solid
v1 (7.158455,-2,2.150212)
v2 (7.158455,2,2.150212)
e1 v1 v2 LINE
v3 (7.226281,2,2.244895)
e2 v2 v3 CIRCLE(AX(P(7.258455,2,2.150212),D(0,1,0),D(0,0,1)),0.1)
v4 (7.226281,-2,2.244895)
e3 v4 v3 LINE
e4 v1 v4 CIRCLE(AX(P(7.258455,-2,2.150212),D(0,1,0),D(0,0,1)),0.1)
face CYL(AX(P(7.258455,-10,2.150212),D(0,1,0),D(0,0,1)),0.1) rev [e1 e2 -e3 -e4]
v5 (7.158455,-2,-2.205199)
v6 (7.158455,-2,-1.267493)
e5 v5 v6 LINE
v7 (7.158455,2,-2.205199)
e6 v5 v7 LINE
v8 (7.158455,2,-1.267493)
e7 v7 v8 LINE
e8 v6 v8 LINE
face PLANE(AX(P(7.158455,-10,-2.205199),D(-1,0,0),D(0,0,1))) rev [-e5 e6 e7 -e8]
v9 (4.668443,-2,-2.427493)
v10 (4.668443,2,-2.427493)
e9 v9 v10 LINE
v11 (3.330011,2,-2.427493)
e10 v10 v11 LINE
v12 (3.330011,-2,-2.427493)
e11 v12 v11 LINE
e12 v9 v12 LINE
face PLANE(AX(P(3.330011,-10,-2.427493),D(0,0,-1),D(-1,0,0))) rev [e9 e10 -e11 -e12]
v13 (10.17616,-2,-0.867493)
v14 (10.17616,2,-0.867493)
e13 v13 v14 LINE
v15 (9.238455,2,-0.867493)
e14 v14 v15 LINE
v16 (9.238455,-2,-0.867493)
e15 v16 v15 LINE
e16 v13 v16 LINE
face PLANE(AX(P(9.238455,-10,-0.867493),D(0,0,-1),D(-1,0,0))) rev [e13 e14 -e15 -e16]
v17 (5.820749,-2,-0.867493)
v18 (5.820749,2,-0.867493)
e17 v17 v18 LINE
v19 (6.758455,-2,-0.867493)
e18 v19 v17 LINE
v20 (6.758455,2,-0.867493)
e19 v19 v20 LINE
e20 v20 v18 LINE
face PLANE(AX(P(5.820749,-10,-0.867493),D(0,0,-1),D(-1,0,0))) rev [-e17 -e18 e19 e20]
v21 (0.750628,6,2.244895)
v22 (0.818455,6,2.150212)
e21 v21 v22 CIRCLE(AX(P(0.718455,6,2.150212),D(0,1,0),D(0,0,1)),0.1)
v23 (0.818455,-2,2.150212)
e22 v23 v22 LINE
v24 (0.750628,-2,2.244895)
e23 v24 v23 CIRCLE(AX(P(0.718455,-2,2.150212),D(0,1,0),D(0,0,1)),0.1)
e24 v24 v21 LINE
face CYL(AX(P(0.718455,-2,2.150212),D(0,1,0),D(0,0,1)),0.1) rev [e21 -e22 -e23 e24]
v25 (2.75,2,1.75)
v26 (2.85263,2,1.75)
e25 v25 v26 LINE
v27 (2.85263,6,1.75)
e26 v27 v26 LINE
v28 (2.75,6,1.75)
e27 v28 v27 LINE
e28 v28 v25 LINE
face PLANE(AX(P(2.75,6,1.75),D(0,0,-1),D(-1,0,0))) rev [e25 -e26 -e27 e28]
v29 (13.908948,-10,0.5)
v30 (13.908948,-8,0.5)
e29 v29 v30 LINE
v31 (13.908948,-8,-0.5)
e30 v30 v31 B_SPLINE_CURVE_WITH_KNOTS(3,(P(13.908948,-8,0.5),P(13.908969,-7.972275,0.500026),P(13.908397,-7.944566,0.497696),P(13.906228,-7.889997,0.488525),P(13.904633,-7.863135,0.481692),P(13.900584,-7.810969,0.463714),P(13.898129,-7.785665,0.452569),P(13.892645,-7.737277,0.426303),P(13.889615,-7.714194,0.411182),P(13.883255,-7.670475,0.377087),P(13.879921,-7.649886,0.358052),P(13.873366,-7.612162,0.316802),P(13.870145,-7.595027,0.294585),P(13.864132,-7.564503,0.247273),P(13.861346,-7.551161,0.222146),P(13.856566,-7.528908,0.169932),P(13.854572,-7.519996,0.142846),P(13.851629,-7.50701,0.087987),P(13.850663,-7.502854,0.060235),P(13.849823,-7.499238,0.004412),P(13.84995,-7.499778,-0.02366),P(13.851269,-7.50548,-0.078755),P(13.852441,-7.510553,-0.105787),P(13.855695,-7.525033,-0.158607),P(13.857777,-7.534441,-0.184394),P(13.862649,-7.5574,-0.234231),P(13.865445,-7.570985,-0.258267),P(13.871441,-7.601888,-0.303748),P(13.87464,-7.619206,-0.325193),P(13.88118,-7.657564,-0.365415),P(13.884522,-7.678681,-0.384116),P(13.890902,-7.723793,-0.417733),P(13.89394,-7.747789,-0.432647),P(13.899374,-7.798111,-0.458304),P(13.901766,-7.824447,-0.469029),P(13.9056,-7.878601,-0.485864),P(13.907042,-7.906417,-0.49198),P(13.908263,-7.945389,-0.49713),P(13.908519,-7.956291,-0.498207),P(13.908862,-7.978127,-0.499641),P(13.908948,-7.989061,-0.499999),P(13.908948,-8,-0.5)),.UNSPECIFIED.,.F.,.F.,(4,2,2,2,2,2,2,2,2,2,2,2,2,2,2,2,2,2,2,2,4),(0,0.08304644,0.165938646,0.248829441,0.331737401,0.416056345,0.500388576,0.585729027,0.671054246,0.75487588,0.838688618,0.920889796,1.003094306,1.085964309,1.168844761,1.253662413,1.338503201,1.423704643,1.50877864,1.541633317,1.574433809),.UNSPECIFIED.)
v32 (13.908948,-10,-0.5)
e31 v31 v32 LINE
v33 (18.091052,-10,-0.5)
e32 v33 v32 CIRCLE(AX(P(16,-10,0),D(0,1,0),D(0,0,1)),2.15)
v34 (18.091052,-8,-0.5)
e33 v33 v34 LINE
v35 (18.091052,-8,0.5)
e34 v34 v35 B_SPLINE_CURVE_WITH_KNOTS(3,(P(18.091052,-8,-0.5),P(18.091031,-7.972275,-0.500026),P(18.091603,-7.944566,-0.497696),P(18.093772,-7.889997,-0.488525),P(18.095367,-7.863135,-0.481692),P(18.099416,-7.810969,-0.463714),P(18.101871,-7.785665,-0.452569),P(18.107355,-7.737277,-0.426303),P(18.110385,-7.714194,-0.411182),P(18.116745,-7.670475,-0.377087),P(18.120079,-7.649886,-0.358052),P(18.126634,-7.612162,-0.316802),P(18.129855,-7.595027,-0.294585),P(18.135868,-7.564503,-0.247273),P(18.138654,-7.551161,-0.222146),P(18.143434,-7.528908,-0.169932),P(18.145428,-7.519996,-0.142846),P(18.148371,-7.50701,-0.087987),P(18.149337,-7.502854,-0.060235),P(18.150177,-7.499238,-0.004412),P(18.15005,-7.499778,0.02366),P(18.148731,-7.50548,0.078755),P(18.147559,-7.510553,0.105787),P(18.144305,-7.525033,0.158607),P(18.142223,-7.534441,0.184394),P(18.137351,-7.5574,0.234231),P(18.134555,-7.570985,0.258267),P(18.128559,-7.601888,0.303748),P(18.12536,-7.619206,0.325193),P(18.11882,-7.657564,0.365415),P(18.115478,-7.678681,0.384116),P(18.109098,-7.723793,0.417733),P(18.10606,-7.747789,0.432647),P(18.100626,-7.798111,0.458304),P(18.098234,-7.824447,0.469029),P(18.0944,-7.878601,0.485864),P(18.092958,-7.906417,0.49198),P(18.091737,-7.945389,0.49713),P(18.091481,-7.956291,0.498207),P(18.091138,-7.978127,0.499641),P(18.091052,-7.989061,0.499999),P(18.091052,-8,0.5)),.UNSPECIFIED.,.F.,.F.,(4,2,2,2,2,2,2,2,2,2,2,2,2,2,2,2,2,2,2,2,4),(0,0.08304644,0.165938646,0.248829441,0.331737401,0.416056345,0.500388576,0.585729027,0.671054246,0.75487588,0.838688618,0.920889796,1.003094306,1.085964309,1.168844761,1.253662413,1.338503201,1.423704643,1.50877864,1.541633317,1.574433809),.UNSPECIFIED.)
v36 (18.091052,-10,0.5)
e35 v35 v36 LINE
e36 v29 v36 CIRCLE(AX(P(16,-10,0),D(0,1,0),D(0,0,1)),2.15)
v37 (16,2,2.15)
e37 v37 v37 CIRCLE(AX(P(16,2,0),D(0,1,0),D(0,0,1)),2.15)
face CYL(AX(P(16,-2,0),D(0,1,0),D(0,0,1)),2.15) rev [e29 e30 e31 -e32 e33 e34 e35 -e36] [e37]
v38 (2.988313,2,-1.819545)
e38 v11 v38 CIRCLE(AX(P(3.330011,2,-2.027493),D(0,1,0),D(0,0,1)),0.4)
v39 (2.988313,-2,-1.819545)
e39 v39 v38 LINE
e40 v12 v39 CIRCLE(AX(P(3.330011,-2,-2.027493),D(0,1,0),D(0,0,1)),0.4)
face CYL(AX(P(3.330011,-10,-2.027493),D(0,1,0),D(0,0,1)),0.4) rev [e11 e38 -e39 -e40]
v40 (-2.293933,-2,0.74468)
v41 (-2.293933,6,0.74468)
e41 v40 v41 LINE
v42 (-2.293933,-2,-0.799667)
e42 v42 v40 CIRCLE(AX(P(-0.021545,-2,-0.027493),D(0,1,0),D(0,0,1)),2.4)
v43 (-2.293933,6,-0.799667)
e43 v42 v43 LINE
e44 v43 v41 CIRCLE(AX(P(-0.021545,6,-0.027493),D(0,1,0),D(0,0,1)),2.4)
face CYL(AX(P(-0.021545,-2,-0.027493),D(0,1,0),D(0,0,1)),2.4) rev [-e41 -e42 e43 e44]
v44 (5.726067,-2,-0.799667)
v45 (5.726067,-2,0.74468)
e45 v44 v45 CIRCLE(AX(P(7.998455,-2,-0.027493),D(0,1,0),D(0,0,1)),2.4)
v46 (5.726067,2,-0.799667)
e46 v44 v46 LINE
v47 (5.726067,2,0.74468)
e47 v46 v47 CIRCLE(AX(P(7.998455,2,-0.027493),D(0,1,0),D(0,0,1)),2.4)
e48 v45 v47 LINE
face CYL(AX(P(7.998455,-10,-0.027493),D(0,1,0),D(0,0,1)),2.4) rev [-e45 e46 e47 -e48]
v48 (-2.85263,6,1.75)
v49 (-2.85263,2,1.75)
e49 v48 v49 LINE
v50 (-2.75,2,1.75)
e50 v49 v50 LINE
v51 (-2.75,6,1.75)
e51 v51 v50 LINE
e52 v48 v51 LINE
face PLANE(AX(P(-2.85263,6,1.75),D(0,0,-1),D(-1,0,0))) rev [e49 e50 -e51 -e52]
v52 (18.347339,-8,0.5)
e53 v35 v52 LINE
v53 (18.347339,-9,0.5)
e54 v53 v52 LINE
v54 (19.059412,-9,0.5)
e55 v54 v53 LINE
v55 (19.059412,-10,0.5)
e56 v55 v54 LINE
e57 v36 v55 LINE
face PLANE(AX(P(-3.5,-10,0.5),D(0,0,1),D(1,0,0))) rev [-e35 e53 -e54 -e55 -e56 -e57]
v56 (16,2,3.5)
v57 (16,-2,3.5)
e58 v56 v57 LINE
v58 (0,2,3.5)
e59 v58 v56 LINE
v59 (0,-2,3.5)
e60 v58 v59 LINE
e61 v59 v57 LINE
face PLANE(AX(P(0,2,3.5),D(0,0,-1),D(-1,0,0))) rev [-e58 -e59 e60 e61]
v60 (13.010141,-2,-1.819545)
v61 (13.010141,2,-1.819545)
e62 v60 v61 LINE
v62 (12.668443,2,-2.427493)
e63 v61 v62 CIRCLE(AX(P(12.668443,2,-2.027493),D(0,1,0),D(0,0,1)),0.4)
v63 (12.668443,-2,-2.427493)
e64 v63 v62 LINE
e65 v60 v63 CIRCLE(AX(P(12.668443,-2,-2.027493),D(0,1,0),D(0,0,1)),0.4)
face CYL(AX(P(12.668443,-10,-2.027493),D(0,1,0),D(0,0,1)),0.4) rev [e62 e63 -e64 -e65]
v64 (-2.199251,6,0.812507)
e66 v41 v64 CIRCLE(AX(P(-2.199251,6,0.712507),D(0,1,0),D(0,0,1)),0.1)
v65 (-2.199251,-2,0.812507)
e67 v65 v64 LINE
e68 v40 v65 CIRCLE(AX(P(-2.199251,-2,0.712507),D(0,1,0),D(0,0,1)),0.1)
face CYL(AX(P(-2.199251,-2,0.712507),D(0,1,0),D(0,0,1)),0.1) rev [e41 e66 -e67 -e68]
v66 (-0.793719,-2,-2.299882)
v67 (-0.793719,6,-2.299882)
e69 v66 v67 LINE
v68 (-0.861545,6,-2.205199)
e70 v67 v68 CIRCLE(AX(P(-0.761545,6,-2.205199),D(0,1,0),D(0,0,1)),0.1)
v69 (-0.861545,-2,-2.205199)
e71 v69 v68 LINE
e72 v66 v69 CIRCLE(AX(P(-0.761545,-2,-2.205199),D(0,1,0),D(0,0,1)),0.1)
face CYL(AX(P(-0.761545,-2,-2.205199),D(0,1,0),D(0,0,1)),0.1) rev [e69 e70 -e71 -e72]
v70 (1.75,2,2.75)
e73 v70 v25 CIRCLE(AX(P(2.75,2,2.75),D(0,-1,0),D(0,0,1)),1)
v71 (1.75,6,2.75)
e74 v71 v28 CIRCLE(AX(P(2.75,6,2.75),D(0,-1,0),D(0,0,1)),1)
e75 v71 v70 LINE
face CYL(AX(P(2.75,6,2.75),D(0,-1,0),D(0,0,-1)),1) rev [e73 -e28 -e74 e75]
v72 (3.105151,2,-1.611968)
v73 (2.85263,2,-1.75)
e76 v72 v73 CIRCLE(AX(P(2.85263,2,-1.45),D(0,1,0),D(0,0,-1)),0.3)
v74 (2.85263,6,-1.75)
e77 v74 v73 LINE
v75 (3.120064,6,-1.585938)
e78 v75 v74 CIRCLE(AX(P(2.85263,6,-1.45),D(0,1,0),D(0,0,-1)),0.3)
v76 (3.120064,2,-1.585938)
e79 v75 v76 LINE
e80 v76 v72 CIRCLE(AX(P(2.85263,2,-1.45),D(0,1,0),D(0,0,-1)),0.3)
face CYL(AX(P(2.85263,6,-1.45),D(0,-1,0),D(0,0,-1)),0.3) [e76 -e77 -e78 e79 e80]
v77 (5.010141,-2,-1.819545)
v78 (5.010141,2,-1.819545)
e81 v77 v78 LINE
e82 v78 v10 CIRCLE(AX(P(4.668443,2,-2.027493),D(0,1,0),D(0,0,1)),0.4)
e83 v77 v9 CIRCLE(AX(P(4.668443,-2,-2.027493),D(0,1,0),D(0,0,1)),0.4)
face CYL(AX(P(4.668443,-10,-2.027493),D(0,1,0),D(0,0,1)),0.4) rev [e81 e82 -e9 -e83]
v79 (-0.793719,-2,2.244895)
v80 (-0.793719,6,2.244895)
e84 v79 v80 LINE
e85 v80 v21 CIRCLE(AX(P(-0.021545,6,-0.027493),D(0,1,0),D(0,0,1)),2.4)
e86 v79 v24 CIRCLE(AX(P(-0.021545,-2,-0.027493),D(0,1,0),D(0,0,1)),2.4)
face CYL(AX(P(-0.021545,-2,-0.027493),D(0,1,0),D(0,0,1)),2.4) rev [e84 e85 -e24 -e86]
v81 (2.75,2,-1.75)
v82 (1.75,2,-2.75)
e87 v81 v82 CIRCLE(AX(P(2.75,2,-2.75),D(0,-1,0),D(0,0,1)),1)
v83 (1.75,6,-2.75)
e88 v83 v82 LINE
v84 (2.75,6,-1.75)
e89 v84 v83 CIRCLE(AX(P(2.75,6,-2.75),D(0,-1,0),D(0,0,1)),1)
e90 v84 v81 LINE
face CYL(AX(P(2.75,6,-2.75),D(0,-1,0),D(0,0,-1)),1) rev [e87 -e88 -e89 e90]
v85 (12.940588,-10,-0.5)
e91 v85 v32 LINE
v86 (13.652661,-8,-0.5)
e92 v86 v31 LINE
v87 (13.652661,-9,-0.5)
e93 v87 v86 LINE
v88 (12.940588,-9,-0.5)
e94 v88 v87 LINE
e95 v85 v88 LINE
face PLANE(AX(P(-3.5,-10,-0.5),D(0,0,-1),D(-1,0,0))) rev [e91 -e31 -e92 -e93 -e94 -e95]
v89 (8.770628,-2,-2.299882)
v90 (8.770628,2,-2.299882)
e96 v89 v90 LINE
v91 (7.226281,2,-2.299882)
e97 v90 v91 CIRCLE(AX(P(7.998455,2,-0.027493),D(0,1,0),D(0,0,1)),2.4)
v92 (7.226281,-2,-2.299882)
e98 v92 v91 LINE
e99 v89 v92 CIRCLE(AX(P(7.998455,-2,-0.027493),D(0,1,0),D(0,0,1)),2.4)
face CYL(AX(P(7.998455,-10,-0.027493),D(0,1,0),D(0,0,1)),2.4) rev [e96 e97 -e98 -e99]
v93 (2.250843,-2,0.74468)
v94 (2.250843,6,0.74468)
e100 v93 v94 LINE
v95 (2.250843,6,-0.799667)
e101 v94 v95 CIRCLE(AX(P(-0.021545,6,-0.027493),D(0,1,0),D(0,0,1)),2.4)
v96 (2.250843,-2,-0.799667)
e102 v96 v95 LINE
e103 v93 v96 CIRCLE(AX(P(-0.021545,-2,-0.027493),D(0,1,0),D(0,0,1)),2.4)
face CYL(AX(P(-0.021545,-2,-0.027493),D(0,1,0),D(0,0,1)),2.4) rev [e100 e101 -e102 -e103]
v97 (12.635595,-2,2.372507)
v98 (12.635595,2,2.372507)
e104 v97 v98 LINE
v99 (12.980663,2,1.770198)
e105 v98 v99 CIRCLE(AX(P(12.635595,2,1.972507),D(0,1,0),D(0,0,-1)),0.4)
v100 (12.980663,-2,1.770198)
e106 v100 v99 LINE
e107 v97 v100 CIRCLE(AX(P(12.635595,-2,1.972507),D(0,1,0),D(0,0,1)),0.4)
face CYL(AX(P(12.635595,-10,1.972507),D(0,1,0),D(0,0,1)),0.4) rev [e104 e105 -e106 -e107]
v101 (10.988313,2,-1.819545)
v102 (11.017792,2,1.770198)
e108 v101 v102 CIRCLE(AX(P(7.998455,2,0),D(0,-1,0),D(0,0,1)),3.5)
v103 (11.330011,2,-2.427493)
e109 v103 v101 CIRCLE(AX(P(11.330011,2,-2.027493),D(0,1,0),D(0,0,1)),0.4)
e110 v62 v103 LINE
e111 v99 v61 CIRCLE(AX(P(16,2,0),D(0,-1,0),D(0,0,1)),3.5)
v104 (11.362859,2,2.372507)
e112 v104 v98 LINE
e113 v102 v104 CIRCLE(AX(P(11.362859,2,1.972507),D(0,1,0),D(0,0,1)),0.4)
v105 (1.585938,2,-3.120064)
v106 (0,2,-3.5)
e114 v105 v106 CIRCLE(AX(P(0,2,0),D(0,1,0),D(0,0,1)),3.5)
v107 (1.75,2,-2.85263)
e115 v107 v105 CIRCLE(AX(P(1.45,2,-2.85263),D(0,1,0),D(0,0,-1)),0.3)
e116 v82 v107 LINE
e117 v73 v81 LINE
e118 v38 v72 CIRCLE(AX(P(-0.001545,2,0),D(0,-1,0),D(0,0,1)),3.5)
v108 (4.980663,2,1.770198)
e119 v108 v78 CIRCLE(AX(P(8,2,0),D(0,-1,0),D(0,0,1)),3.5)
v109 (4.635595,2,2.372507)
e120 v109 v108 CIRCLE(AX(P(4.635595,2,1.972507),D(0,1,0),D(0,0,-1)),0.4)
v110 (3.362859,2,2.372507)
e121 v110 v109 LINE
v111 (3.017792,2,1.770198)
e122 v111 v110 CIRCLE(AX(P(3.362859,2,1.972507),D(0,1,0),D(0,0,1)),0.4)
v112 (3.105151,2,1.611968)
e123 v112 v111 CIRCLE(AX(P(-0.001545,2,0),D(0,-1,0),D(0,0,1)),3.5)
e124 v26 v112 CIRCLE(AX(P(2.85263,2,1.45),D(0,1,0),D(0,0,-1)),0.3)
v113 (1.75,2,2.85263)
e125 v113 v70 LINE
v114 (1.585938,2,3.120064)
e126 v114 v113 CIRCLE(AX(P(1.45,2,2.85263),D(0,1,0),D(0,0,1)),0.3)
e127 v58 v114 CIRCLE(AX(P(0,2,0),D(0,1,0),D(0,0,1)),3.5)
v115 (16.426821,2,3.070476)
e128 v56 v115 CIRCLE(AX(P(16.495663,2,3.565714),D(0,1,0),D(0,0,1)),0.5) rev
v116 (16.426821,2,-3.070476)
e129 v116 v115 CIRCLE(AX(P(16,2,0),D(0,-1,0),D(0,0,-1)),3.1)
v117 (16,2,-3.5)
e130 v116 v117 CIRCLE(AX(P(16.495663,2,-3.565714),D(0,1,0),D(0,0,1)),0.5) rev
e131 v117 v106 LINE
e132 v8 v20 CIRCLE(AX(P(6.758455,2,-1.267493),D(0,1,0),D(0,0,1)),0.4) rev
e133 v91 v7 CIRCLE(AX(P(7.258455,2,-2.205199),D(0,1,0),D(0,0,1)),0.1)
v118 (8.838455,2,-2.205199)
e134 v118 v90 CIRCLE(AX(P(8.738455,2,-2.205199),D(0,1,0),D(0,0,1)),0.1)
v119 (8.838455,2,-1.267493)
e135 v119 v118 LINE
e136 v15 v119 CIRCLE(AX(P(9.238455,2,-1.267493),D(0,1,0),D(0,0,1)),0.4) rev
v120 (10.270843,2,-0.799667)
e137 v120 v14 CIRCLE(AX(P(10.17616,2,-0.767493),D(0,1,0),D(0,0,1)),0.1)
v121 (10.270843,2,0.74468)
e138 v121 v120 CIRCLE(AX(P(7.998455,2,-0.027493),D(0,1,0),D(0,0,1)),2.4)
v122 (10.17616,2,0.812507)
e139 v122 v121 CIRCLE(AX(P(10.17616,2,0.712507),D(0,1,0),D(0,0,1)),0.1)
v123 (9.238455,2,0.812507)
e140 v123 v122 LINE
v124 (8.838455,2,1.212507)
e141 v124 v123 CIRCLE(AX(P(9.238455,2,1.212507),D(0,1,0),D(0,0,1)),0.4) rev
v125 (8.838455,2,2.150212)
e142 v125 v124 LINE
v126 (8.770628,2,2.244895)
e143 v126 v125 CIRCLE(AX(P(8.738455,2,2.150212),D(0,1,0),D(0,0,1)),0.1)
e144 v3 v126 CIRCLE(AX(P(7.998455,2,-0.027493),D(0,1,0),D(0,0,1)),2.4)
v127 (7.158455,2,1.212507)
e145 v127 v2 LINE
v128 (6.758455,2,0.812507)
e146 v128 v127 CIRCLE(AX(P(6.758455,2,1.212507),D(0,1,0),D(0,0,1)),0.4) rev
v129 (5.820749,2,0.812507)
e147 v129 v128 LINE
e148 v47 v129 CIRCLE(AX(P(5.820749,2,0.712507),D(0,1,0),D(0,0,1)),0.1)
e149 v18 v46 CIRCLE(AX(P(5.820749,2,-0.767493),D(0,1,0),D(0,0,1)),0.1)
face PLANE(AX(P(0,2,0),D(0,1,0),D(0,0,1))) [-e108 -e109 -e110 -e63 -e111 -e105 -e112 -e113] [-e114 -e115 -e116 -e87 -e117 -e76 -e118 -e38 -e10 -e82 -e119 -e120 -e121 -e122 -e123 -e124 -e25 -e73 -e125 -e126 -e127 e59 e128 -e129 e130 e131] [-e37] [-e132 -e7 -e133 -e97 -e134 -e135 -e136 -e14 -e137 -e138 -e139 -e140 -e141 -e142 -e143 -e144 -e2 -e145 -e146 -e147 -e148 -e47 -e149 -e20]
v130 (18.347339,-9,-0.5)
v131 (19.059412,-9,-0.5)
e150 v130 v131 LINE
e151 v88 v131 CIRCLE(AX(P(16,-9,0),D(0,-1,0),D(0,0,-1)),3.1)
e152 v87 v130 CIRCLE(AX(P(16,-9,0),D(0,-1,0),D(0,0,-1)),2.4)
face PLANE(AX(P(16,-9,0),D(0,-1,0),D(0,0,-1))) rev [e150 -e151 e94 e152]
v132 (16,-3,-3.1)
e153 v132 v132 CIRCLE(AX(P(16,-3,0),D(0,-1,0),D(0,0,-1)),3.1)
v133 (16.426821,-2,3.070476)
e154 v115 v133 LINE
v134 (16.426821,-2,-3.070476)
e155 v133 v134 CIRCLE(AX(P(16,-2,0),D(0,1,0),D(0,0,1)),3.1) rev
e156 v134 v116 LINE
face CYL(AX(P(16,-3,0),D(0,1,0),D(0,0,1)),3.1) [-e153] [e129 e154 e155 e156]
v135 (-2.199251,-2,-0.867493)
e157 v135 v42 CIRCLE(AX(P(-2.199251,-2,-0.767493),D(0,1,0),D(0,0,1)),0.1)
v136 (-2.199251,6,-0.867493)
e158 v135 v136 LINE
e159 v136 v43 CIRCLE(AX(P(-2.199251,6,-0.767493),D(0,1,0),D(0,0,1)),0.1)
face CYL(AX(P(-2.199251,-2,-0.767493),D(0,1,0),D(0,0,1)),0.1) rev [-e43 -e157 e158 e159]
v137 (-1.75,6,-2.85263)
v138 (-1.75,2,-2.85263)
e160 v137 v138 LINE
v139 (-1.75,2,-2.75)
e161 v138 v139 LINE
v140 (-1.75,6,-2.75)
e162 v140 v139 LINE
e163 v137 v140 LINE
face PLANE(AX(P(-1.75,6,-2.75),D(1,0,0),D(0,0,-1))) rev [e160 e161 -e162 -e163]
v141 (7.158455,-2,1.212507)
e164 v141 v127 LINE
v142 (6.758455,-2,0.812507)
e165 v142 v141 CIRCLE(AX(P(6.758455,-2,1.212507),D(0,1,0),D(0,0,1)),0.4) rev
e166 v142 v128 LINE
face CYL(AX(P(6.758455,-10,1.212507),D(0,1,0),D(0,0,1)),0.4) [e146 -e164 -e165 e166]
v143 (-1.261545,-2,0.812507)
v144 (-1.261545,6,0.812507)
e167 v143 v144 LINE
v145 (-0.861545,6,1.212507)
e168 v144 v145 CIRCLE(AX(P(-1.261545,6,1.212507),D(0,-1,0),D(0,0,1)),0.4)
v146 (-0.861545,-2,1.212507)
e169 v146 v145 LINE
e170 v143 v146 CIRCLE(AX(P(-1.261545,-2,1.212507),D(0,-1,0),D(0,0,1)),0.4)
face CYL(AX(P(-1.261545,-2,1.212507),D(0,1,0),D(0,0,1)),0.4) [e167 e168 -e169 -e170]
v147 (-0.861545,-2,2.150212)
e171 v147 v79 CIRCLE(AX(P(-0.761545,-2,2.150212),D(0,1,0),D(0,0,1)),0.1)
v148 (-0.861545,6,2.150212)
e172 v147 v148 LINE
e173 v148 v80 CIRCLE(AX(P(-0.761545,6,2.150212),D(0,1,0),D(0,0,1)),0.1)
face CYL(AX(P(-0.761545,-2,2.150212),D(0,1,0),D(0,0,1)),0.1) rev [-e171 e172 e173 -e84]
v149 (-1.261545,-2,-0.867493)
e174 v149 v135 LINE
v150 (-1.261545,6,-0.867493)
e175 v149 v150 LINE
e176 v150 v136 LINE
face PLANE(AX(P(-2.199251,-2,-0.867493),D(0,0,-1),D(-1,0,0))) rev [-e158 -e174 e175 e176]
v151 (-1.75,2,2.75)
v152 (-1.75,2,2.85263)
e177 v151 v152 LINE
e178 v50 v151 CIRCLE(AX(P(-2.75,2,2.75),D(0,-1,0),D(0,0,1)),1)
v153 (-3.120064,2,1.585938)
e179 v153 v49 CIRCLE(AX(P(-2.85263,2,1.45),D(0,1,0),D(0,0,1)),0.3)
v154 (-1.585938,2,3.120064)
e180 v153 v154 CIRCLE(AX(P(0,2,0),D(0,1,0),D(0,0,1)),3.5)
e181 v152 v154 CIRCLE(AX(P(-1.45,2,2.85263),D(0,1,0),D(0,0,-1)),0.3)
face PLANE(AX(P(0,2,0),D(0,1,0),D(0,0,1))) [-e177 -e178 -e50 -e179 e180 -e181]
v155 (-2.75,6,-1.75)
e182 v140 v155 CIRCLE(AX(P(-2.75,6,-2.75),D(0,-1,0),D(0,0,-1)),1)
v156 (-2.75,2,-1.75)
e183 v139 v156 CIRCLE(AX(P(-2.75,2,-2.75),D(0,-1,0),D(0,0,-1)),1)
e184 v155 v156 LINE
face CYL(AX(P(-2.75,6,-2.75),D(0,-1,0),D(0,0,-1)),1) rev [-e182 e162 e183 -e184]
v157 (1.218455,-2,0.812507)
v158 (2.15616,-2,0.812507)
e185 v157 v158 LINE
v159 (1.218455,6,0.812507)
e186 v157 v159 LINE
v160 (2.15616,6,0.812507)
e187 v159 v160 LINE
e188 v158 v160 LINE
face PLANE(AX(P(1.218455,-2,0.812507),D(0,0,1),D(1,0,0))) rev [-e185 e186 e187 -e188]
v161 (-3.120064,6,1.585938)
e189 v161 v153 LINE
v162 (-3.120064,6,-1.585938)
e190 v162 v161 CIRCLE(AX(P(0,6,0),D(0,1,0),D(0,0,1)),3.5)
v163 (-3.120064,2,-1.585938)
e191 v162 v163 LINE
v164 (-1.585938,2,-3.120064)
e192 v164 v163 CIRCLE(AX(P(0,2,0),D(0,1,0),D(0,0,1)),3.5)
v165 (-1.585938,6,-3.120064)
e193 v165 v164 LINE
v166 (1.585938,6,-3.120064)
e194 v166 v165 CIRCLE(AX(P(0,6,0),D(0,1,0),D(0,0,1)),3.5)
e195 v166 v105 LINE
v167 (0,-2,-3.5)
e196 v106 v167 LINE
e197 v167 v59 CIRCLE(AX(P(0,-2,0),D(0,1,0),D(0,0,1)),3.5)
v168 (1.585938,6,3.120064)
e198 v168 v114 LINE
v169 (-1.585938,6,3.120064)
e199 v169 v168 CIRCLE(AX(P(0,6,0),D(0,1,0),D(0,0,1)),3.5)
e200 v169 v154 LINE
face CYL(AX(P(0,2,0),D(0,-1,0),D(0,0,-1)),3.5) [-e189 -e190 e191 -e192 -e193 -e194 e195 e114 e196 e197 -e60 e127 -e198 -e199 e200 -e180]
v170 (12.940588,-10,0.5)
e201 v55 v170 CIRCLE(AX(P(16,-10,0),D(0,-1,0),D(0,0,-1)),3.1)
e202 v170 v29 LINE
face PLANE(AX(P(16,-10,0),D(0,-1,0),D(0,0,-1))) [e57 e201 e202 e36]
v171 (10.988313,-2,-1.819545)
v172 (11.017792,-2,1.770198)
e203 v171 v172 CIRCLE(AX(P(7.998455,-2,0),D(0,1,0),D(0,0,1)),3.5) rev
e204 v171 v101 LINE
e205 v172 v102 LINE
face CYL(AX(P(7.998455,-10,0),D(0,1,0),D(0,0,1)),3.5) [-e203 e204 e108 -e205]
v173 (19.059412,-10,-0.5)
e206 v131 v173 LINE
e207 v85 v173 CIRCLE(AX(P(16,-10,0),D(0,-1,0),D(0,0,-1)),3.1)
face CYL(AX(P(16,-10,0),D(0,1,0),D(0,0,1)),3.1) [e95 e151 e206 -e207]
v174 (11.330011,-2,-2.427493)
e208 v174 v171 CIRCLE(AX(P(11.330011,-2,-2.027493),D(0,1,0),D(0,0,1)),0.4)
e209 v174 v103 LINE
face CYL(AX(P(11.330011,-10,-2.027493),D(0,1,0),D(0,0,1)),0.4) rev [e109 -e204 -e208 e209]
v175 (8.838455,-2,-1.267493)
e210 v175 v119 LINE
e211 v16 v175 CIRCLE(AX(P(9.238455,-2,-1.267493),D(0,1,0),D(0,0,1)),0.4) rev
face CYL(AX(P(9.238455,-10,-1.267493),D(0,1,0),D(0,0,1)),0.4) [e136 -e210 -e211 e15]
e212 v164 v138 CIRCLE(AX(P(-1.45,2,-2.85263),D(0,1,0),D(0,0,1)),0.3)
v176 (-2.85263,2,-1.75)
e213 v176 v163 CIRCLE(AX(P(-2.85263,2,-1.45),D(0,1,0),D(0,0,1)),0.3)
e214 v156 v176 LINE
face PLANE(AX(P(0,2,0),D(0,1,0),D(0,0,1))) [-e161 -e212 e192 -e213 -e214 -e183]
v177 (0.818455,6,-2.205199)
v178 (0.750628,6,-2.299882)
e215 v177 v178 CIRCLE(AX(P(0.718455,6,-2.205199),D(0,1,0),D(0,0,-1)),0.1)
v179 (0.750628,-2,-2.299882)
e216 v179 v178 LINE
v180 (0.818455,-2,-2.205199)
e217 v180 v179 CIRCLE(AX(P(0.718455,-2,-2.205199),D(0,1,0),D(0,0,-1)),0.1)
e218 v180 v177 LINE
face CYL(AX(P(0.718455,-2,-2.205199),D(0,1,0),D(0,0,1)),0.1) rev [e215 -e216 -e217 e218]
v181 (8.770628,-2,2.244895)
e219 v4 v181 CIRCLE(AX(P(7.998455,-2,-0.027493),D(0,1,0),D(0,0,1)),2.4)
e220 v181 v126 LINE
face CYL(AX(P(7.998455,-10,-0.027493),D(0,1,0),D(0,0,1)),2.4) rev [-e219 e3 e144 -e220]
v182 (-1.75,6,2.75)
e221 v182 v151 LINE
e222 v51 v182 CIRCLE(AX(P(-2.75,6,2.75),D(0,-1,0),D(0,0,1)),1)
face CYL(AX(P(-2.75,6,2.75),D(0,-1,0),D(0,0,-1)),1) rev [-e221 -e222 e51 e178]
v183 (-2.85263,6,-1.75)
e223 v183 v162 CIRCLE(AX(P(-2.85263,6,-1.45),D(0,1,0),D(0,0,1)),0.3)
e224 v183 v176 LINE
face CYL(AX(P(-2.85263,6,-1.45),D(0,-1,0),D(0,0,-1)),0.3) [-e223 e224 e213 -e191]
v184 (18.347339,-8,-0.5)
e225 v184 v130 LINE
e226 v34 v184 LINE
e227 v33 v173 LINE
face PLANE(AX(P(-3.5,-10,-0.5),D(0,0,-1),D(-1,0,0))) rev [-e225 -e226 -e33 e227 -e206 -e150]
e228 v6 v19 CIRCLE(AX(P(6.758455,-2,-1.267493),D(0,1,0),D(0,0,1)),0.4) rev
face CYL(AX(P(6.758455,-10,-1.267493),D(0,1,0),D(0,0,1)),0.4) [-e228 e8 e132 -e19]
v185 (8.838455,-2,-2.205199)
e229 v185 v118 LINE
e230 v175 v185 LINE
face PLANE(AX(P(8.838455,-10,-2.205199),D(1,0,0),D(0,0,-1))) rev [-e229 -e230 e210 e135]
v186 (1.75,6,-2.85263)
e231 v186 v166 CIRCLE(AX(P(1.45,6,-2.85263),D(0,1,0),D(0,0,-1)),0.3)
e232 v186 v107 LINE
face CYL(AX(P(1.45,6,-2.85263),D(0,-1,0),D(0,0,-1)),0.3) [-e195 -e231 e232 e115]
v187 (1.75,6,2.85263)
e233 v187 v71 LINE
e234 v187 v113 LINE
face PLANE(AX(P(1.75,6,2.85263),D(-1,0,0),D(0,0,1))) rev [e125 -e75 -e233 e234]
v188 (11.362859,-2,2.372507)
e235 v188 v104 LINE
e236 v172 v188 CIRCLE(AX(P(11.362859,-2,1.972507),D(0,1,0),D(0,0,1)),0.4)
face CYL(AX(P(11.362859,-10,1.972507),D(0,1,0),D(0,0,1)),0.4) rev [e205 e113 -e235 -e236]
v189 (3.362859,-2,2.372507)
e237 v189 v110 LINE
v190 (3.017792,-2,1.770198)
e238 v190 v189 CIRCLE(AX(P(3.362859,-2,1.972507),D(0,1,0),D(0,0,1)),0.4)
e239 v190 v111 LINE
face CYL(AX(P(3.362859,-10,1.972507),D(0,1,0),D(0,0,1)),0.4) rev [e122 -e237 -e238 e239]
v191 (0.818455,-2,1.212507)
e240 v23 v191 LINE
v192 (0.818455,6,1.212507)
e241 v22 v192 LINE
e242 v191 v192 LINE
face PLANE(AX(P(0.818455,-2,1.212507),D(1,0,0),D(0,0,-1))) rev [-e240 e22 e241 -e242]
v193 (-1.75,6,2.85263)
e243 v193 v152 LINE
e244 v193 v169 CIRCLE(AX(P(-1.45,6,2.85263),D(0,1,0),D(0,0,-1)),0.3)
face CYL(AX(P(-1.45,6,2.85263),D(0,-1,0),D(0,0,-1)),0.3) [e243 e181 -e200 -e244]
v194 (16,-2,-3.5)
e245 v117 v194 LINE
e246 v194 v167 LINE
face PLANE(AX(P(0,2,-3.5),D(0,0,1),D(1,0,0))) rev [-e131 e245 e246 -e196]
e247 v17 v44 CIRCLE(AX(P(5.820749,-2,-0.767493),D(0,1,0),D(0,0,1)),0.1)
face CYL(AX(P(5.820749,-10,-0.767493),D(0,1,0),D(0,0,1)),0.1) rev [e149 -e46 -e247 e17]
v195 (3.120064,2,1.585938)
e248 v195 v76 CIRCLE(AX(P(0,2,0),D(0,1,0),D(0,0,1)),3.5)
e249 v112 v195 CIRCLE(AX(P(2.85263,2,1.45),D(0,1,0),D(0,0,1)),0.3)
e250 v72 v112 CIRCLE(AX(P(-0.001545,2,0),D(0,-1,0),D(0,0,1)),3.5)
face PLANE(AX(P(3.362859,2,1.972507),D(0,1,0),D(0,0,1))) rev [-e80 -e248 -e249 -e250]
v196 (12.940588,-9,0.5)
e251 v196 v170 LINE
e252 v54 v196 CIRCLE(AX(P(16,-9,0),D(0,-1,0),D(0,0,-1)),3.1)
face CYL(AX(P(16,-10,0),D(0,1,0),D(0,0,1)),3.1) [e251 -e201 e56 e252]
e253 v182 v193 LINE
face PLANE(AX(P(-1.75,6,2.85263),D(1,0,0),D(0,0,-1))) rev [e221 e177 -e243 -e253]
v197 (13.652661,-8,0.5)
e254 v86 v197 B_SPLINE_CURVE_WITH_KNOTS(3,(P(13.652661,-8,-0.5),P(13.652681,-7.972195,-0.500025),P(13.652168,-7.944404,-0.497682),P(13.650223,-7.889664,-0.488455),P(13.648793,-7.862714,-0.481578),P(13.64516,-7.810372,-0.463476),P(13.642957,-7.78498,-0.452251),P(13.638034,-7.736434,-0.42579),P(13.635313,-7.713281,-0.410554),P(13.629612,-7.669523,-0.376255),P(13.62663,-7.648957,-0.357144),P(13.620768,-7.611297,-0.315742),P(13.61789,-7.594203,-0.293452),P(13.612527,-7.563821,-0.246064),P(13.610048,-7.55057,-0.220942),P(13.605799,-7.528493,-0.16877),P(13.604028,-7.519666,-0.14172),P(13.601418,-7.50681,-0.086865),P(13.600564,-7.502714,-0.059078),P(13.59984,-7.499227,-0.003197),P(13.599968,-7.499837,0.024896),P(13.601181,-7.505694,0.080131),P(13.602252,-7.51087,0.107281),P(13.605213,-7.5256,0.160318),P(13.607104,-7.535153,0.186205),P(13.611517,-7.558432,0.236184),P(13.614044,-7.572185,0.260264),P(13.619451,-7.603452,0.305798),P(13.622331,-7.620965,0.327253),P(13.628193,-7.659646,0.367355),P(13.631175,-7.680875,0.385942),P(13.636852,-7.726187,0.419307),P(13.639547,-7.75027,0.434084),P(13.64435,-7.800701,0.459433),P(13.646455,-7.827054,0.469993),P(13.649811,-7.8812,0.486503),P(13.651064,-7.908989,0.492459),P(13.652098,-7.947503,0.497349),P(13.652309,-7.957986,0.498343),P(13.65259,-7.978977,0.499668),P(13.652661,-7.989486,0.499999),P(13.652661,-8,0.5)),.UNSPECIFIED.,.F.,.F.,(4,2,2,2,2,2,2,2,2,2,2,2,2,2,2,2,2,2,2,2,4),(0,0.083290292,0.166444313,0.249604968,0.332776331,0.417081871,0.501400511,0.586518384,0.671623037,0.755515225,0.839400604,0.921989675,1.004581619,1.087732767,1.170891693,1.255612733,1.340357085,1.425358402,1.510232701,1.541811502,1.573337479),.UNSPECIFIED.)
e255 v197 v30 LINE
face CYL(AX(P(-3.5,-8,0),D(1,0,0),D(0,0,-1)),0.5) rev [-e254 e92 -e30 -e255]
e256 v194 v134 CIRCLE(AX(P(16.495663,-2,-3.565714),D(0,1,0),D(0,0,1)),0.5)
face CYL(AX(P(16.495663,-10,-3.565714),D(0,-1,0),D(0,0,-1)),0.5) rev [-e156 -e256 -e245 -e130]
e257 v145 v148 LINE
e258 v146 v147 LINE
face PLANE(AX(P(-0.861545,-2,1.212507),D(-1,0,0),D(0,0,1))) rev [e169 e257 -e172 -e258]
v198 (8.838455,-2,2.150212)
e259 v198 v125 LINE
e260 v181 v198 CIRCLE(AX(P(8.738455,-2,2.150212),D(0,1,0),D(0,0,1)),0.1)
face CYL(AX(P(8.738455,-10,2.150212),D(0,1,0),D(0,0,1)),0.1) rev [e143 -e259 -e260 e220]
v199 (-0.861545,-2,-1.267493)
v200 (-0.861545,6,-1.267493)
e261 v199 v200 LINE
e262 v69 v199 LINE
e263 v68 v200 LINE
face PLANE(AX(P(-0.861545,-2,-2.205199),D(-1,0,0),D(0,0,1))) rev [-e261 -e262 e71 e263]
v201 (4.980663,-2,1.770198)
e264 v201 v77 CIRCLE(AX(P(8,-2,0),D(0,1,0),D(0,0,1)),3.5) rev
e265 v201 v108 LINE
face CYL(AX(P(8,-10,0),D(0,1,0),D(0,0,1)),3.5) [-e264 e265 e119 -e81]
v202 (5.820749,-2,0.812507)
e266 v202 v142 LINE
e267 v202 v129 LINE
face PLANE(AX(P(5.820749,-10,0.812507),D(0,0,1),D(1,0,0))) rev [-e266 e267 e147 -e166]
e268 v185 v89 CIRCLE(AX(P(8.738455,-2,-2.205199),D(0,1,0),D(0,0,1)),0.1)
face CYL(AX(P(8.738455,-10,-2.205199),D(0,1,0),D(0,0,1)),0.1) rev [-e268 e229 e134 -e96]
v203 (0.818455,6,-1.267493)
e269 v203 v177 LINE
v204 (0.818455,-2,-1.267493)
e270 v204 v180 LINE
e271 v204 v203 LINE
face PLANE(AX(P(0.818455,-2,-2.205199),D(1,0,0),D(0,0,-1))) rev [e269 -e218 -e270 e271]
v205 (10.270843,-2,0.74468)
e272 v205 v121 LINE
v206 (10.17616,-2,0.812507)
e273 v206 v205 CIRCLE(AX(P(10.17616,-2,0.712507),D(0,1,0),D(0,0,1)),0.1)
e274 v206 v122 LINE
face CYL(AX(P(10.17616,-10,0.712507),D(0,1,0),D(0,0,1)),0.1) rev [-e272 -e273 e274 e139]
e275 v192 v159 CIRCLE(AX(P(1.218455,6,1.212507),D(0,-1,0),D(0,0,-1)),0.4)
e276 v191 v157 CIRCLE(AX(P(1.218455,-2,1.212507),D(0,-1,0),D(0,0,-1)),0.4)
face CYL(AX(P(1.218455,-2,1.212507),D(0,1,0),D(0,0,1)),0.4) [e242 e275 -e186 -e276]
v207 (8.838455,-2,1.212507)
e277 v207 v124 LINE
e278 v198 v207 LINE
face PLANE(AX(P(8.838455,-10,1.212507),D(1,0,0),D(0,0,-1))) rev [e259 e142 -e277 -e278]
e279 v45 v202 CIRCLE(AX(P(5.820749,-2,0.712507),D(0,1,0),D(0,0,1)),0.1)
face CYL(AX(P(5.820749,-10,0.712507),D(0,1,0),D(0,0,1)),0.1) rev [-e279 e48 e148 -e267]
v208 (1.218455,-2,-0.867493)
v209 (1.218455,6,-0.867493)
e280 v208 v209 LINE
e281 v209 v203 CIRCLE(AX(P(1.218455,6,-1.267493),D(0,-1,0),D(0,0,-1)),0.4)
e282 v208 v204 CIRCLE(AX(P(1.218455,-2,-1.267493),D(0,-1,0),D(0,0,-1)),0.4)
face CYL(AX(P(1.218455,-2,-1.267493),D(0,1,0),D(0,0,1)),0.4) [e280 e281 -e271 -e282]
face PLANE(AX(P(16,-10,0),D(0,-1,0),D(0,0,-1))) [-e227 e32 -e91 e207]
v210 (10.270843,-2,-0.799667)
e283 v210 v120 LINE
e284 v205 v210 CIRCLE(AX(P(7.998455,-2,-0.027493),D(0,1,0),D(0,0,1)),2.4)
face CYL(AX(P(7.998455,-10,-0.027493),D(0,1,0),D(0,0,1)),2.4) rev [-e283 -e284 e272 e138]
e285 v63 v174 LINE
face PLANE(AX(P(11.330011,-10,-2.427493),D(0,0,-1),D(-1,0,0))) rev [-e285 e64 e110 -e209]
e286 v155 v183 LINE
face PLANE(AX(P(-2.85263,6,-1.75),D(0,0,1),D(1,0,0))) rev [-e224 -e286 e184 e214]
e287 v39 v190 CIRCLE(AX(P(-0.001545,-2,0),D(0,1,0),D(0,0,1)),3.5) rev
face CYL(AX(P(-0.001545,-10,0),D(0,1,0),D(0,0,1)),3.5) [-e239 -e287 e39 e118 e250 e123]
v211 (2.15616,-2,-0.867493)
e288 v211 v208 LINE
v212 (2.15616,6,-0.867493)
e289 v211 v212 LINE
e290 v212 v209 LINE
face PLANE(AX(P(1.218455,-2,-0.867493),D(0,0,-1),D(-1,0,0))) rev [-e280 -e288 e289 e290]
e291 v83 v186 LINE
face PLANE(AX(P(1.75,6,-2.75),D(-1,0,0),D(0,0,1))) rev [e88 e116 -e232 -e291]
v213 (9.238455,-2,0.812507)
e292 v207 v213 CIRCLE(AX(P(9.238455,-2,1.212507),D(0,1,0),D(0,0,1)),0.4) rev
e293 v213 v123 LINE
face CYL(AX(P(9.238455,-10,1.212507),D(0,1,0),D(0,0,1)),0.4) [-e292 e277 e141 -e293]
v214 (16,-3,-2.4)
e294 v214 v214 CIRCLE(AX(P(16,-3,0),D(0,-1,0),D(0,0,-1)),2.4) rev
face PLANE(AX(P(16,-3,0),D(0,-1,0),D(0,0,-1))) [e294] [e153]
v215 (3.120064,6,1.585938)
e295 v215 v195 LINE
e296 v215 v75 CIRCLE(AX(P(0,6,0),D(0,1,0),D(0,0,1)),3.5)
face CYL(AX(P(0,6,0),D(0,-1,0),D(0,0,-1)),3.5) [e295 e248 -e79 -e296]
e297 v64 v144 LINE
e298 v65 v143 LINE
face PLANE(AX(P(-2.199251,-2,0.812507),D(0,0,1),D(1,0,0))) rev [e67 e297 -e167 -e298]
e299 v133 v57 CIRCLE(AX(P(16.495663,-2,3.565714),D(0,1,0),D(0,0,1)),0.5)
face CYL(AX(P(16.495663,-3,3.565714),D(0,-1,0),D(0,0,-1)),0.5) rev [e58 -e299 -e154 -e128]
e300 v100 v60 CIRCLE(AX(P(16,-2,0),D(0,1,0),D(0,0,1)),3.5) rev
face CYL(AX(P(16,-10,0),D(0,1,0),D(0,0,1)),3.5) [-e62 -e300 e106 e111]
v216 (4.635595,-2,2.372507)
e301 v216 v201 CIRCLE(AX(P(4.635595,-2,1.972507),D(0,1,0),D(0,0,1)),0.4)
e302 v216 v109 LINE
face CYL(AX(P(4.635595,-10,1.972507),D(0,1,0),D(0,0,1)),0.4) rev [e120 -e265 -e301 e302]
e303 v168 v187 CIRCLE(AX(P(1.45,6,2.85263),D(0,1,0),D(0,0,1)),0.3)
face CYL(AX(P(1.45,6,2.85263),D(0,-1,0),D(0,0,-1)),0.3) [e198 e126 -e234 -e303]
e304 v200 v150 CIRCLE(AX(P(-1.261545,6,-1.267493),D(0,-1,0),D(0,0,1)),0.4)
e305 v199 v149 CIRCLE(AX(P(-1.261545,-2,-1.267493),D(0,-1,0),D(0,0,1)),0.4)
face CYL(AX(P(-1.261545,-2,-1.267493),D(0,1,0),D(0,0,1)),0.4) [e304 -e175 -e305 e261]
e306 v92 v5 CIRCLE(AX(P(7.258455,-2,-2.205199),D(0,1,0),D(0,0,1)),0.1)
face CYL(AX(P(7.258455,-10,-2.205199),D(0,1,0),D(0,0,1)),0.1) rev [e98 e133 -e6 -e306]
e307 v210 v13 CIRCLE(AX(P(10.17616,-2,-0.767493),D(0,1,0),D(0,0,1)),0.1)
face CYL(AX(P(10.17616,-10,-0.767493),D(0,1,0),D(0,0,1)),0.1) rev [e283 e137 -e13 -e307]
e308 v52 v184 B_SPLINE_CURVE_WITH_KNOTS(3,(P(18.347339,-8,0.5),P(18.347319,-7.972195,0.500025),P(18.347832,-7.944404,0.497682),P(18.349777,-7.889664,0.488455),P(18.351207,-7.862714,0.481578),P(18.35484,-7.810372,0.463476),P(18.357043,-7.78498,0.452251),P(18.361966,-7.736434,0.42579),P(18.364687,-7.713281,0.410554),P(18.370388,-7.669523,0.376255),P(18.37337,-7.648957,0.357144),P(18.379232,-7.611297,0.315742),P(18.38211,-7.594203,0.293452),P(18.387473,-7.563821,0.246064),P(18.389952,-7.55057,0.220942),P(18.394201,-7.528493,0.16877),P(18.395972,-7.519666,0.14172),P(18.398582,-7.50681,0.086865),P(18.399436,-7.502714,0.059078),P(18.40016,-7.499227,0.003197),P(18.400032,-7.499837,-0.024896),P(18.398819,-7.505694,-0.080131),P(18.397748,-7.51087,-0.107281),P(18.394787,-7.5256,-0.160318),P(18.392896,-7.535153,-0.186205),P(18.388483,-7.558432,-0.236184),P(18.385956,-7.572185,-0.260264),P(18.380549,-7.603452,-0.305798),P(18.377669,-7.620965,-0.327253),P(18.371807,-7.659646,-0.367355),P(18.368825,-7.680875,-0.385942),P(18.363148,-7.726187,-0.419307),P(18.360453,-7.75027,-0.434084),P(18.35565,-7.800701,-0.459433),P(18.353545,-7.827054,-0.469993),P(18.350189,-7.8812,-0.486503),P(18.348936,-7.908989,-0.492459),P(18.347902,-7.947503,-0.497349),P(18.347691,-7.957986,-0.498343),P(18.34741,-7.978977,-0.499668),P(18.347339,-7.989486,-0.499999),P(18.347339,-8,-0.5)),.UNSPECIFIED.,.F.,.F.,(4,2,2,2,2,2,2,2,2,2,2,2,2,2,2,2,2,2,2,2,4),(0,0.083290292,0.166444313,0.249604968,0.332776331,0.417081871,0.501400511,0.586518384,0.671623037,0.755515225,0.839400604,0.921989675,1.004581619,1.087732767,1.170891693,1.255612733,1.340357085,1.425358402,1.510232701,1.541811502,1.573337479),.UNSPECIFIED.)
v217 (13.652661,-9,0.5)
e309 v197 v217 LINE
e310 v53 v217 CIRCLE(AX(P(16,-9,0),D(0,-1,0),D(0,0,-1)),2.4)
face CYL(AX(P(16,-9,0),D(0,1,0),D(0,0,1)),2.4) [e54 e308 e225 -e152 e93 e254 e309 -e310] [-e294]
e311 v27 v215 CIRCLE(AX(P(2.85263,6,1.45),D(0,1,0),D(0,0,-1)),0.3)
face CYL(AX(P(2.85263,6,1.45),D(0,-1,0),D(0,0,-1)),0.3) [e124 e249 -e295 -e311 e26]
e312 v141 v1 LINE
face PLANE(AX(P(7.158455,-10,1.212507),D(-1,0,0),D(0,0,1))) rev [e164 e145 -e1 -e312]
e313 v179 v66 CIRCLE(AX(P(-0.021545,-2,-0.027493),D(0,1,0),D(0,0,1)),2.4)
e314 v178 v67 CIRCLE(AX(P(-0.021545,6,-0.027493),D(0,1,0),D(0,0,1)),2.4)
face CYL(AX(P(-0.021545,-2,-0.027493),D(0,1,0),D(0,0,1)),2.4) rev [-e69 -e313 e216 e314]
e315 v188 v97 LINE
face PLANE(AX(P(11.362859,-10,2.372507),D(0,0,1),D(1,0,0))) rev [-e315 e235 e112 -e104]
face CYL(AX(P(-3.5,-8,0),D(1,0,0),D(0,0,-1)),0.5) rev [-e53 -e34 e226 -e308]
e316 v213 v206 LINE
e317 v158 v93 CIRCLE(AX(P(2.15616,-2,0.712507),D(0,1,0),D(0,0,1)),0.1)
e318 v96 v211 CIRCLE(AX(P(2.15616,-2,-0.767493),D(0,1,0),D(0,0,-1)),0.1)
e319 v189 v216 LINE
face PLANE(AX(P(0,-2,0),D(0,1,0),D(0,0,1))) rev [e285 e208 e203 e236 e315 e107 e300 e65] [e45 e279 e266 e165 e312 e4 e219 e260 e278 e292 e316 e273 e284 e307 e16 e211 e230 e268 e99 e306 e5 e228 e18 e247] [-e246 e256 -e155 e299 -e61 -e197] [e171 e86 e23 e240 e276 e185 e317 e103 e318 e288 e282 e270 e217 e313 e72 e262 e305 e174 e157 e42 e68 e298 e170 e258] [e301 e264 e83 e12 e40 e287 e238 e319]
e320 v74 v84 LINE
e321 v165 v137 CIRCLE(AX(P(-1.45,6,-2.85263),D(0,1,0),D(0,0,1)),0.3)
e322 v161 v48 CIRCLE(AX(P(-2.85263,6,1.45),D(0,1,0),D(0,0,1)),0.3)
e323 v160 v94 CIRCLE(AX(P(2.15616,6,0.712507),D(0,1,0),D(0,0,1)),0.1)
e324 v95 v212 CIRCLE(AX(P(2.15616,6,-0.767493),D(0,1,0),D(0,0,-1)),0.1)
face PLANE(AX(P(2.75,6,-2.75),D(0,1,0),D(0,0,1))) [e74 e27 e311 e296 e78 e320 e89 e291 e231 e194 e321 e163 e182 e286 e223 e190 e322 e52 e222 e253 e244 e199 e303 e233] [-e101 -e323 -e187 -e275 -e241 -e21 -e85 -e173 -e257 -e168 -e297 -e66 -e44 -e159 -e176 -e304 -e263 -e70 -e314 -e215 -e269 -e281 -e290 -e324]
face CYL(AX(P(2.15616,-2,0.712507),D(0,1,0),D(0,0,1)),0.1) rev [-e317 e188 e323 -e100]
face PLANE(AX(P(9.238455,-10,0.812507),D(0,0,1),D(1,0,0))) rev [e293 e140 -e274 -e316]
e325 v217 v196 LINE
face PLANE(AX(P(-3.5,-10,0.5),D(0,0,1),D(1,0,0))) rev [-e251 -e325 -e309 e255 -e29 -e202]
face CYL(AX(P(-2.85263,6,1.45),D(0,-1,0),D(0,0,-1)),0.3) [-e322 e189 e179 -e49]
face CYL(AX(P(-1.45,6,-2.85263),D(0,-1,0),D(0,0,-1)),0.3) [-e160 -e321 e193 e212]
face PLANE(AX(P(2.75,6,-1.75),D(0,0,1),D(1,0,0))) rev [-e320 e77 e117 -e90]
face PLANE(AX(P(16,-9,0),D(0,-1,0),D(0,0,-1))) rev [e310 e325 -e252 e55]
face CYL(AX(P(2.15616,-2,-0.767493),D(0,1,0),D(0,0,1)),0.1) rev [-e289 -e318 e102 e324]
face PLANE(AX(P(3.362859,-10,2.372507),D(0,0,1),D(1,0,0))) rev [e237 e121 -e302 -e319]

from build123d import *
from build123d.topology import SkipClean

# Parameters (mm, degrees)
BOSS_EXTRUDE1_DEPTH     = 2
BOSS_EXTRUDE3_START     = 4
BOSS_EXTRUDE3_DEPTH     = 4
CUT_EXTRUDE1_DEPTH      = 22.365860619
SKETCH8_R               = 2.15
CUT_EXTRUDE3_DEPTH      = 4
SKETCH10_R              = 3.1
BOSS_EXTRUDE4_DEPTH     = 1
SKETCH12_R              = 2.4
BOSS_EXTRUDE5_DEPTH     = 7
SKETCH15_R              = 3.1
BOSS_EXTRUDE6_DEPTH     = 1
SKETCH16_R              = 2.15
CUT_EXTRUDE4_DEPTH      = 22.365860619
CUT_EXTRUDE5_DEPTH      = 23.192341021
CUT_EXTRUDE5_DEPTH_BACK = 23.192341021
LPATTERN3_COUNT         = 2
LPATTERN3_PITCH         = 8.02
CUT_EXTRUDE6_DEPTH      = 24.162469696
LPATTERN4_COUNT         = 2
LPATTERN4_PITCH         = 8
CUT_EXTRUDE7_DEPTH      = 24.162469696
FILLET2_R               = 0.5
FILLET3_R               = 0.5


with BuildPart() as part:
    # Sketch2 → Boss-Extrude1 (new, symmetric)
    with BuildSketch(Plane(origin=(0, 0, 0), x_dir=(1, 0, 0), z_dir=(0, 1, 0))):
        with BuildLine():
            Line((0, 3.5), (16, 3.5))
            ThreePointArc((16, 3.5), (19.5, 0), (16, -3.5))
            Line((16, -3.5), (0, -3.5))
            ThreePointArc((0, -3.5), (-3.5, 0), (0, 3.5))
        make_face()
    extrude(amount=BOSS_EXTRUDE1_DEPTH, both=True)

    # Sketch3 → Boss-Extrude3 (add)
    with SkipClean():  # the faces are left unmerged after this step: merging them gives an invalid solid
        with BuildSketch(Plane(origin=(0, 2, 0), x_dir=(1, 0, 0), z_dir=(0, 1, 0)).offset(BOSS_EXTRUDE3_START)):
            with BuildLine():
                Line((1.75, 2.75), (1.75, 2.852630365))
                ThreePointArc((1.75, 2.852630365), (1.705715907, 3.00950412), (1.5859375, 3.120064462))
                ThreePointArc((1.5859375, 3.120064462), (0, 3.5), (-1.5859375, 3.120064462))
                ThreePointArc((-1.5859375, 3.120064462), (-1.705715907, 3.00950412), (-1.75, 2.852630365))
                Line((-1.75, 2.852630365), (-1.75, 2.75))
                ThreePointArc((-1.75, 2.75), (-2.042893219, 2.042893219), (-2.75, 1.75))
                Line((-2.75, 1.75), (-2.852630365, 1.75))
                ThreePointArc((-2.852630365, 1.75), (-3.00950412, 1.705715907), (-3.120064462, 1.5859375))
                ThreePointArc((-3.120064462, 1.5859375), (-3.5, 0), (-3.120064462, -1.5859375))
                ThreePointArc((-3.120064462, -1.5859375), (-3.00950412, -1.705715907), (-2.852630365, -1.75))
                Line((-2.852630365, -1.75), (-2.75, -1.75))
                ThreePointArc((-2.75, -1.75), (-2.042893219, -2.042893219), (-1.75, -2.75))
                Line((-1.75, -2.75), (-1.75, -2.852630365))
                ThreePointArc((-1.75, -2.852630365), (-1.705715907, -3.00950412), (-1.5859375, -3.120064462))
                ThreePointArc((-1.5859375, -3.120064462), (0, -3.5), (1.5859375, -3.120064462))
                ThreePointArc((1.5859375, -3.120064462), (1.705715907, -3.00950412), (1.75, -2.852630365))
                Line((1.75, -2.852630365), (1.75, -2.75))
                ThreePointArc((1.75, -2.75), (2.042893219, -2.042893219), (2.75, -1.75))
                Line((2.75, -1.75), (2.852630365, -1.75))
                ThreePointArc((2.852630365, -1.75), (3.00950412, -1.705715907), (3.120064462, -1.5859375))
                ThreePointArc((3.120064462, -1.5859375), (3.5, 0), (3.120064462, 1.5859375))
                ThreePointArc((3.120064462, 1.5859375), (3.00950412, 1.705715907), (2.852630365, 1.75))
                Line((2.852630365, 1.75), (2.75, 1.75))
                ThreePointArc((2.75, 1.75), (2.042893219, 2.042893219), (1.75, 2.75))
            make_face()
        extrude(amount=-BOSS_EXTRUDE3_DEPTH)

    # Sketch4 → Cut-Extrude1 (cut, through all)
    with SkipClean():  # the faces are left unmerged after this step: merging them gives an invalid solid
        with BuildSketch(Plane(origin=(0, 6, 0), x_dir=(1, 0, 0), z_dir=(0, 1, 0))):
            with BuildLine():
                Line((-0.861545414, -1.212506528), (-0.861545414, -2.150211742))
                ThreePointArc((-0.861545414, -2.150211742), (-0.842839298, -2.208446649), (-0.793719327, -2.244894577))
                ThreePointArc((-0.793719327, -2.244894577), (-0.021545414, -2.372506528), (0.750628499, -2.244894577))
                ThreePointArc((0.750628499, -2.244894577), (0.799748471, -2.208446649), (0.818454586, -2.150211742))
                Line((0.818454586, -2.150211742), (0.818454586, -1.212506528))
                ThreePointArc((0.818454586, -1.212506528), (0.935611874, -0.929663815), (1.218454586, -0.812506528))
                Line((1.218454586, -0.812506528), (2.156159801, -0.812506528))
                ThreePointArc((2.156159801, -0.812506528), (2.214394707, -0.793800412), (2.250842636, -0.744680441))
                ThreePointArc((2.250842636, -0.744680441), (2.378454586, 0.027493472), (2.250842636, 0.799667385))
                ThreePointArc((2.250842636, 0.799667385), (2.214394707, 0.848787357), (2.156159801, 0.867493472))
                Line((2.156159801, 0.867493472), (1.218454586, 0.867493472))
                ThreePointArc((1.218454586, 0.867493472), (0.935611874, 0.98465076), (0.818454586, 1.267493472))
                Line((0.818454586, 1.267493472), (0.818454586, 2.205198686))
                ThreePointArc((0.818454586, 2.205198686), (0.799748471, 2.263433593), (0.750628499, 2.299881522))
                ThreePointArc((0.750628499, 2.299881522), (-0.021545414, 2.427493472), (-0.793719327, 2.299881522))
                ThreePointArc((-0.793719327, 2.299881522), (-0.842839298, 2.263433593), (-0.861545414, 2.205198686))
                Line((-0.861545414, 2.205198686), (-0.861545414, 1.267493472))
                ThreePointArc((-0.861545414, 1.267493472), (-0.978702701, 0.98465076), (-1.261545414, 0.867493472))
                Line((-1.261545414, 0.867493472), (-2.199250628, 0.867493472))
                ThreePointArc((-2.199250628, 0.867493472), (-2.257485535, 0.848787357), (-2.293933463, 0.799667385))
                ThreePointArc((-2.293933463, 0.799667385), (-2.421545414, 0.027493472), (-2.293933463, -0.744680441))
                ThreePointArc((-2.293933463, -0.744680441), (-2.257485535, -0.793800412), (-2.199250628, -0.812506528))
                Line((-2.199250628, -0.812506528), (-1.261545414, -0.812506528))
                ThreePointArc((-1.261545414, -0.812506528), (-0.978702701, -0.929663815), (-0.861545414, -1.212506528))
            make_face()
        cut_extrude1 = extrude(amount=-CUT_EXTRUDE1_DEPTH, mode=Mode.SUBTRACT)

    # Sketch8 → Cut-Extrude3 (cut)
    with SkipClean():  # the faces are left unmerged after this step: merging them gives an invalid solid
        with BuildSketch(Plane(origin=(0, 2, 0), x_dir=(1, 0, 0), z_dir=(0, 1, 0))):
            with Locations(Location((16, 0, 0), (0, 0, 270))):
                Circle(SKETCH8_R)
        extrude(amount=-CUT_EXTRUDE3_DEPTH, mode=Mode.SUBTRACT)

    # Sketch10 → Boss-Extrude4 (add)
    with SkipClean():  # the faces are left unmerged after this step: merging them gives an invalid solid
        with BuildSketch(Plane(origin=(0, -2, 0), x_dir=(-1, 0, 0), z_dir=(0, -1, 0))):
            with Locations(Location((-16, 0, 0), (0, 0, 270))):
                Circle(SKETCH10_R)
        extrude(amount=BOSS_EXTRUDE4_DEPTH)

    # Sketch12 → Boss-Extrude5 (add)
    with SkipClean():  # the faces are left unmerged after this step: merging them gives an invalid solid
        with BuildSketch(Plane(origin=(0, -2, 0), x_dir=(-1, 0, 0), z_dir=(0, -1, 0))):
            with Locations(Location((-16, 0, 0), (0, 0, 90))):
                Circle(SKETCH12_R)
        extrude(amount=BOSS_EXTRUDE5_DEPTH)

    # Sketch15 → Boss-Extrude6 (add)
    with SkipClean():  # the faces are left unmerged after this step: merging them gives an invalid solid
        with BuildSketch(Plane(origin=(0, -9, 0), x_dir=(-1, 0, 0), z_dir=(0, -1, 0))):
            with Locations(Location((-16, 0, 0), (0, 0, 270))):
                Circle(SKETCH15_R)
        extrude(amount=BOSS_EXTRUDE6_DEPTH)

    # Sketch16 → Cut-Extrude4 (cut, through all)
    with SkipClean():  # the faces are left unmerged after this step: merging them gives an invalid solid
        with BuildSketch(Plane(origin=(0, -2, 0), x_dir=(1, 0, 0), z_dir=(0, 1, 0))):
            with Locations(Location((16, 0, 0), (0, 0, 270))):
                Circle(SKETCH16_R)
        extrude(amount=-CUT_EXTRUDE4_DEPTH, mode=Mode.SUBTRACT)

    # Sketch17 → Cut-Extrude5 (cut, two sides: drawn at the far end of the back side and taken through both)
    with SkipClean():  # the faces are left unmerged after this step: merging them gives an invalid solid
        with BuildSketch(Plane(origin=(0, 0, 0), x_dir=(0, 0, -1), z_dir=(1, 0, 0)).offset(-CUT_EXTRUDE5_DEPTH_BACK)):
            with BuildLine():
                Line((-0.5, -10), (-0.5, -8))
                ThreePointArc((-0.5, -8), (0, -7.5), (0.5, -8))
                Line((0.5, -8), (0.5, -10))
                ThreePointArc((0.5, -10), (0, -10.5), (-0.5, -10))
            make_face()
        extrude(amount=CUT_EXTRUDE5_DEPTH + CUT_EXTRUDE5_DEPTH_BACK, mode=Mode.SUBTRACT)

    # LPattern3: Cut-Extrude1 ×2
    with SkipClean():  # the faces are left unmerged after this step: merging them gives an invalid solid
        with Locations(*[(i * LPATTERN3_PITCH, 0, 0) for i in range(1, LPATTERN3_COUNT)]):
            add(cut_extrude1, mode=Mode.SUBTRACT)

    # Sketch20 → Cut-Extrude6 (cut, through all)
    with SkipClean():  # the faces are left unmerged after this step: merging them gives an invalid solid
        with BuildSketch(Plane(origin=(0, 2, 0), x_dir=(1, 0, 0), z_dir=(0, 1, 0))):
            with BuildLine():
                Line((11.330011313, 2.427493472), (12.668443274, 2.427493472))
                ThreePointArc((12.668443274, 2.427493472), (13.017140291, 2.223479161), (13.010141399, 1.819545424))
                ThreePointArc((13.010141399, 1.819545424), (12.500118007, 0.028740879), (12.98066258, -1.770198166))
                ThreePointArc((12.98066258, -1.770198166), (12.982671335, -2.171348997), (12.635595447, -2.372506528))
                Line((12.635595447, -2.372506528), (11.362859139, -2.372506528))
                ThreePointArc((11.362859139, -2.372506528), (11.015783251, -2.171348997), (11.017792006, -1.770198166))
                ThreePointArc((11.017792006, -1.770198166), (11.498336579, 0.028740879), (10.988313187, 1.819545424))
                ThreePointArc((10.988313187, 1.819545424), (10.981314296, 2.223479161), (11.330011313, 2.427493472))
            make_face()
        cut_extrude6 = extrude(amount=-CUT_EXTRUDE6_DEPTH, mode=Mode.SUBTRACT)

    # LPattern4: Cut-Extrude6 ×2
    with Locations(*[(-i * LPATTERN4_PITCH, 0, 0) for i in range(1, LPATTERN4_COUNT)]):
        add(cut_extrude6, mode=Mode.SUBTRACT)

    # Sketch25 → Cut-Extrude7 (cut, through all)
    with BuildSketch(Plane(origin=(0, 2, 0), x_dir=(1, 0, 0), z_dir=(0, 1, 0))):
        with BuildLine():
            Line((16, 3.5), (16, 3.1))
            ThreePointArc((16, 3.1), (19.1, 0), (16, -3.1))
            Line((16, -3.1), (16, -3.5))
            ThreePointArc((16, -3.5), (19.5, 0), (16, 3.5))
        make_face()
    extrude(amount=-CUT_EXTRUDE7_DEPTH, mode=Mode.SUBTRACT)

    # Fillet2
    # the kernel refuses this fillet: 0.5 mm, written as the material it adds along each edge
    with BuildSketch(Plane(origin=(16, 2, 3.1), x_dir=(0.9976162063830436, 0, -0.06900655593423367), z_dir=(0, -1, 0))) as fillet2_piece_1:
        with BuildLine():
            CenterArc((0.462343925, 0.498808103), FILLET2_R, 191.509080872, 74.533990047)
            Line((-0.027602622, 0.399046483), (-0.037401553, 0.39705125))
            ThreePointArc((-0.037401553, 0.39705125), (-0.023777473, 0.198833176), (-0.009976162, -0.000690066))
            Line((-0.009976162, -0.000690066), (0.000690066, -0.009976162))
            ThreePointArc((0.000690066, -0.009976162), (0.213920323, -0.00261024), (0.427150581, -0.009976162))
            Line((0.427150581, -0.009976162), (0.427840647, 0))
        make_face()
    extrude(amount=4)

    # Fillet3
    # the kernel refuses this fillet: 0.5 mm, written as the material it adds along each edge
    with BuildSketch(Plane(origin=(16, 2, -3.1), x_dir=(0, 0, -1), z_dir=(0, -1, 0))) as fillet3_piece_1:
        with BuildLine():
            CenterArc((0.465714286, 0.495662822), FILLET3_R, 187.913858162, 74.533990047)
            Line((-0.02952381, 0.426820763), (-0.039428571, 0.425443922))
            ThreePointArc((-0.039428571, 0.425443922), (-0.017365922, 0.213230258), (-0.01, 0))
            Line((-0.01, 0), (0, -0.01))
            ThreePointArc((0, -0.01), (0.2, -0.01), (0.398685714, -0.009913256))
            Line((0.398685714, -0.009913256), (0.4, 0))
        make_face()
    extrude(amount=4)


solid = part.part
